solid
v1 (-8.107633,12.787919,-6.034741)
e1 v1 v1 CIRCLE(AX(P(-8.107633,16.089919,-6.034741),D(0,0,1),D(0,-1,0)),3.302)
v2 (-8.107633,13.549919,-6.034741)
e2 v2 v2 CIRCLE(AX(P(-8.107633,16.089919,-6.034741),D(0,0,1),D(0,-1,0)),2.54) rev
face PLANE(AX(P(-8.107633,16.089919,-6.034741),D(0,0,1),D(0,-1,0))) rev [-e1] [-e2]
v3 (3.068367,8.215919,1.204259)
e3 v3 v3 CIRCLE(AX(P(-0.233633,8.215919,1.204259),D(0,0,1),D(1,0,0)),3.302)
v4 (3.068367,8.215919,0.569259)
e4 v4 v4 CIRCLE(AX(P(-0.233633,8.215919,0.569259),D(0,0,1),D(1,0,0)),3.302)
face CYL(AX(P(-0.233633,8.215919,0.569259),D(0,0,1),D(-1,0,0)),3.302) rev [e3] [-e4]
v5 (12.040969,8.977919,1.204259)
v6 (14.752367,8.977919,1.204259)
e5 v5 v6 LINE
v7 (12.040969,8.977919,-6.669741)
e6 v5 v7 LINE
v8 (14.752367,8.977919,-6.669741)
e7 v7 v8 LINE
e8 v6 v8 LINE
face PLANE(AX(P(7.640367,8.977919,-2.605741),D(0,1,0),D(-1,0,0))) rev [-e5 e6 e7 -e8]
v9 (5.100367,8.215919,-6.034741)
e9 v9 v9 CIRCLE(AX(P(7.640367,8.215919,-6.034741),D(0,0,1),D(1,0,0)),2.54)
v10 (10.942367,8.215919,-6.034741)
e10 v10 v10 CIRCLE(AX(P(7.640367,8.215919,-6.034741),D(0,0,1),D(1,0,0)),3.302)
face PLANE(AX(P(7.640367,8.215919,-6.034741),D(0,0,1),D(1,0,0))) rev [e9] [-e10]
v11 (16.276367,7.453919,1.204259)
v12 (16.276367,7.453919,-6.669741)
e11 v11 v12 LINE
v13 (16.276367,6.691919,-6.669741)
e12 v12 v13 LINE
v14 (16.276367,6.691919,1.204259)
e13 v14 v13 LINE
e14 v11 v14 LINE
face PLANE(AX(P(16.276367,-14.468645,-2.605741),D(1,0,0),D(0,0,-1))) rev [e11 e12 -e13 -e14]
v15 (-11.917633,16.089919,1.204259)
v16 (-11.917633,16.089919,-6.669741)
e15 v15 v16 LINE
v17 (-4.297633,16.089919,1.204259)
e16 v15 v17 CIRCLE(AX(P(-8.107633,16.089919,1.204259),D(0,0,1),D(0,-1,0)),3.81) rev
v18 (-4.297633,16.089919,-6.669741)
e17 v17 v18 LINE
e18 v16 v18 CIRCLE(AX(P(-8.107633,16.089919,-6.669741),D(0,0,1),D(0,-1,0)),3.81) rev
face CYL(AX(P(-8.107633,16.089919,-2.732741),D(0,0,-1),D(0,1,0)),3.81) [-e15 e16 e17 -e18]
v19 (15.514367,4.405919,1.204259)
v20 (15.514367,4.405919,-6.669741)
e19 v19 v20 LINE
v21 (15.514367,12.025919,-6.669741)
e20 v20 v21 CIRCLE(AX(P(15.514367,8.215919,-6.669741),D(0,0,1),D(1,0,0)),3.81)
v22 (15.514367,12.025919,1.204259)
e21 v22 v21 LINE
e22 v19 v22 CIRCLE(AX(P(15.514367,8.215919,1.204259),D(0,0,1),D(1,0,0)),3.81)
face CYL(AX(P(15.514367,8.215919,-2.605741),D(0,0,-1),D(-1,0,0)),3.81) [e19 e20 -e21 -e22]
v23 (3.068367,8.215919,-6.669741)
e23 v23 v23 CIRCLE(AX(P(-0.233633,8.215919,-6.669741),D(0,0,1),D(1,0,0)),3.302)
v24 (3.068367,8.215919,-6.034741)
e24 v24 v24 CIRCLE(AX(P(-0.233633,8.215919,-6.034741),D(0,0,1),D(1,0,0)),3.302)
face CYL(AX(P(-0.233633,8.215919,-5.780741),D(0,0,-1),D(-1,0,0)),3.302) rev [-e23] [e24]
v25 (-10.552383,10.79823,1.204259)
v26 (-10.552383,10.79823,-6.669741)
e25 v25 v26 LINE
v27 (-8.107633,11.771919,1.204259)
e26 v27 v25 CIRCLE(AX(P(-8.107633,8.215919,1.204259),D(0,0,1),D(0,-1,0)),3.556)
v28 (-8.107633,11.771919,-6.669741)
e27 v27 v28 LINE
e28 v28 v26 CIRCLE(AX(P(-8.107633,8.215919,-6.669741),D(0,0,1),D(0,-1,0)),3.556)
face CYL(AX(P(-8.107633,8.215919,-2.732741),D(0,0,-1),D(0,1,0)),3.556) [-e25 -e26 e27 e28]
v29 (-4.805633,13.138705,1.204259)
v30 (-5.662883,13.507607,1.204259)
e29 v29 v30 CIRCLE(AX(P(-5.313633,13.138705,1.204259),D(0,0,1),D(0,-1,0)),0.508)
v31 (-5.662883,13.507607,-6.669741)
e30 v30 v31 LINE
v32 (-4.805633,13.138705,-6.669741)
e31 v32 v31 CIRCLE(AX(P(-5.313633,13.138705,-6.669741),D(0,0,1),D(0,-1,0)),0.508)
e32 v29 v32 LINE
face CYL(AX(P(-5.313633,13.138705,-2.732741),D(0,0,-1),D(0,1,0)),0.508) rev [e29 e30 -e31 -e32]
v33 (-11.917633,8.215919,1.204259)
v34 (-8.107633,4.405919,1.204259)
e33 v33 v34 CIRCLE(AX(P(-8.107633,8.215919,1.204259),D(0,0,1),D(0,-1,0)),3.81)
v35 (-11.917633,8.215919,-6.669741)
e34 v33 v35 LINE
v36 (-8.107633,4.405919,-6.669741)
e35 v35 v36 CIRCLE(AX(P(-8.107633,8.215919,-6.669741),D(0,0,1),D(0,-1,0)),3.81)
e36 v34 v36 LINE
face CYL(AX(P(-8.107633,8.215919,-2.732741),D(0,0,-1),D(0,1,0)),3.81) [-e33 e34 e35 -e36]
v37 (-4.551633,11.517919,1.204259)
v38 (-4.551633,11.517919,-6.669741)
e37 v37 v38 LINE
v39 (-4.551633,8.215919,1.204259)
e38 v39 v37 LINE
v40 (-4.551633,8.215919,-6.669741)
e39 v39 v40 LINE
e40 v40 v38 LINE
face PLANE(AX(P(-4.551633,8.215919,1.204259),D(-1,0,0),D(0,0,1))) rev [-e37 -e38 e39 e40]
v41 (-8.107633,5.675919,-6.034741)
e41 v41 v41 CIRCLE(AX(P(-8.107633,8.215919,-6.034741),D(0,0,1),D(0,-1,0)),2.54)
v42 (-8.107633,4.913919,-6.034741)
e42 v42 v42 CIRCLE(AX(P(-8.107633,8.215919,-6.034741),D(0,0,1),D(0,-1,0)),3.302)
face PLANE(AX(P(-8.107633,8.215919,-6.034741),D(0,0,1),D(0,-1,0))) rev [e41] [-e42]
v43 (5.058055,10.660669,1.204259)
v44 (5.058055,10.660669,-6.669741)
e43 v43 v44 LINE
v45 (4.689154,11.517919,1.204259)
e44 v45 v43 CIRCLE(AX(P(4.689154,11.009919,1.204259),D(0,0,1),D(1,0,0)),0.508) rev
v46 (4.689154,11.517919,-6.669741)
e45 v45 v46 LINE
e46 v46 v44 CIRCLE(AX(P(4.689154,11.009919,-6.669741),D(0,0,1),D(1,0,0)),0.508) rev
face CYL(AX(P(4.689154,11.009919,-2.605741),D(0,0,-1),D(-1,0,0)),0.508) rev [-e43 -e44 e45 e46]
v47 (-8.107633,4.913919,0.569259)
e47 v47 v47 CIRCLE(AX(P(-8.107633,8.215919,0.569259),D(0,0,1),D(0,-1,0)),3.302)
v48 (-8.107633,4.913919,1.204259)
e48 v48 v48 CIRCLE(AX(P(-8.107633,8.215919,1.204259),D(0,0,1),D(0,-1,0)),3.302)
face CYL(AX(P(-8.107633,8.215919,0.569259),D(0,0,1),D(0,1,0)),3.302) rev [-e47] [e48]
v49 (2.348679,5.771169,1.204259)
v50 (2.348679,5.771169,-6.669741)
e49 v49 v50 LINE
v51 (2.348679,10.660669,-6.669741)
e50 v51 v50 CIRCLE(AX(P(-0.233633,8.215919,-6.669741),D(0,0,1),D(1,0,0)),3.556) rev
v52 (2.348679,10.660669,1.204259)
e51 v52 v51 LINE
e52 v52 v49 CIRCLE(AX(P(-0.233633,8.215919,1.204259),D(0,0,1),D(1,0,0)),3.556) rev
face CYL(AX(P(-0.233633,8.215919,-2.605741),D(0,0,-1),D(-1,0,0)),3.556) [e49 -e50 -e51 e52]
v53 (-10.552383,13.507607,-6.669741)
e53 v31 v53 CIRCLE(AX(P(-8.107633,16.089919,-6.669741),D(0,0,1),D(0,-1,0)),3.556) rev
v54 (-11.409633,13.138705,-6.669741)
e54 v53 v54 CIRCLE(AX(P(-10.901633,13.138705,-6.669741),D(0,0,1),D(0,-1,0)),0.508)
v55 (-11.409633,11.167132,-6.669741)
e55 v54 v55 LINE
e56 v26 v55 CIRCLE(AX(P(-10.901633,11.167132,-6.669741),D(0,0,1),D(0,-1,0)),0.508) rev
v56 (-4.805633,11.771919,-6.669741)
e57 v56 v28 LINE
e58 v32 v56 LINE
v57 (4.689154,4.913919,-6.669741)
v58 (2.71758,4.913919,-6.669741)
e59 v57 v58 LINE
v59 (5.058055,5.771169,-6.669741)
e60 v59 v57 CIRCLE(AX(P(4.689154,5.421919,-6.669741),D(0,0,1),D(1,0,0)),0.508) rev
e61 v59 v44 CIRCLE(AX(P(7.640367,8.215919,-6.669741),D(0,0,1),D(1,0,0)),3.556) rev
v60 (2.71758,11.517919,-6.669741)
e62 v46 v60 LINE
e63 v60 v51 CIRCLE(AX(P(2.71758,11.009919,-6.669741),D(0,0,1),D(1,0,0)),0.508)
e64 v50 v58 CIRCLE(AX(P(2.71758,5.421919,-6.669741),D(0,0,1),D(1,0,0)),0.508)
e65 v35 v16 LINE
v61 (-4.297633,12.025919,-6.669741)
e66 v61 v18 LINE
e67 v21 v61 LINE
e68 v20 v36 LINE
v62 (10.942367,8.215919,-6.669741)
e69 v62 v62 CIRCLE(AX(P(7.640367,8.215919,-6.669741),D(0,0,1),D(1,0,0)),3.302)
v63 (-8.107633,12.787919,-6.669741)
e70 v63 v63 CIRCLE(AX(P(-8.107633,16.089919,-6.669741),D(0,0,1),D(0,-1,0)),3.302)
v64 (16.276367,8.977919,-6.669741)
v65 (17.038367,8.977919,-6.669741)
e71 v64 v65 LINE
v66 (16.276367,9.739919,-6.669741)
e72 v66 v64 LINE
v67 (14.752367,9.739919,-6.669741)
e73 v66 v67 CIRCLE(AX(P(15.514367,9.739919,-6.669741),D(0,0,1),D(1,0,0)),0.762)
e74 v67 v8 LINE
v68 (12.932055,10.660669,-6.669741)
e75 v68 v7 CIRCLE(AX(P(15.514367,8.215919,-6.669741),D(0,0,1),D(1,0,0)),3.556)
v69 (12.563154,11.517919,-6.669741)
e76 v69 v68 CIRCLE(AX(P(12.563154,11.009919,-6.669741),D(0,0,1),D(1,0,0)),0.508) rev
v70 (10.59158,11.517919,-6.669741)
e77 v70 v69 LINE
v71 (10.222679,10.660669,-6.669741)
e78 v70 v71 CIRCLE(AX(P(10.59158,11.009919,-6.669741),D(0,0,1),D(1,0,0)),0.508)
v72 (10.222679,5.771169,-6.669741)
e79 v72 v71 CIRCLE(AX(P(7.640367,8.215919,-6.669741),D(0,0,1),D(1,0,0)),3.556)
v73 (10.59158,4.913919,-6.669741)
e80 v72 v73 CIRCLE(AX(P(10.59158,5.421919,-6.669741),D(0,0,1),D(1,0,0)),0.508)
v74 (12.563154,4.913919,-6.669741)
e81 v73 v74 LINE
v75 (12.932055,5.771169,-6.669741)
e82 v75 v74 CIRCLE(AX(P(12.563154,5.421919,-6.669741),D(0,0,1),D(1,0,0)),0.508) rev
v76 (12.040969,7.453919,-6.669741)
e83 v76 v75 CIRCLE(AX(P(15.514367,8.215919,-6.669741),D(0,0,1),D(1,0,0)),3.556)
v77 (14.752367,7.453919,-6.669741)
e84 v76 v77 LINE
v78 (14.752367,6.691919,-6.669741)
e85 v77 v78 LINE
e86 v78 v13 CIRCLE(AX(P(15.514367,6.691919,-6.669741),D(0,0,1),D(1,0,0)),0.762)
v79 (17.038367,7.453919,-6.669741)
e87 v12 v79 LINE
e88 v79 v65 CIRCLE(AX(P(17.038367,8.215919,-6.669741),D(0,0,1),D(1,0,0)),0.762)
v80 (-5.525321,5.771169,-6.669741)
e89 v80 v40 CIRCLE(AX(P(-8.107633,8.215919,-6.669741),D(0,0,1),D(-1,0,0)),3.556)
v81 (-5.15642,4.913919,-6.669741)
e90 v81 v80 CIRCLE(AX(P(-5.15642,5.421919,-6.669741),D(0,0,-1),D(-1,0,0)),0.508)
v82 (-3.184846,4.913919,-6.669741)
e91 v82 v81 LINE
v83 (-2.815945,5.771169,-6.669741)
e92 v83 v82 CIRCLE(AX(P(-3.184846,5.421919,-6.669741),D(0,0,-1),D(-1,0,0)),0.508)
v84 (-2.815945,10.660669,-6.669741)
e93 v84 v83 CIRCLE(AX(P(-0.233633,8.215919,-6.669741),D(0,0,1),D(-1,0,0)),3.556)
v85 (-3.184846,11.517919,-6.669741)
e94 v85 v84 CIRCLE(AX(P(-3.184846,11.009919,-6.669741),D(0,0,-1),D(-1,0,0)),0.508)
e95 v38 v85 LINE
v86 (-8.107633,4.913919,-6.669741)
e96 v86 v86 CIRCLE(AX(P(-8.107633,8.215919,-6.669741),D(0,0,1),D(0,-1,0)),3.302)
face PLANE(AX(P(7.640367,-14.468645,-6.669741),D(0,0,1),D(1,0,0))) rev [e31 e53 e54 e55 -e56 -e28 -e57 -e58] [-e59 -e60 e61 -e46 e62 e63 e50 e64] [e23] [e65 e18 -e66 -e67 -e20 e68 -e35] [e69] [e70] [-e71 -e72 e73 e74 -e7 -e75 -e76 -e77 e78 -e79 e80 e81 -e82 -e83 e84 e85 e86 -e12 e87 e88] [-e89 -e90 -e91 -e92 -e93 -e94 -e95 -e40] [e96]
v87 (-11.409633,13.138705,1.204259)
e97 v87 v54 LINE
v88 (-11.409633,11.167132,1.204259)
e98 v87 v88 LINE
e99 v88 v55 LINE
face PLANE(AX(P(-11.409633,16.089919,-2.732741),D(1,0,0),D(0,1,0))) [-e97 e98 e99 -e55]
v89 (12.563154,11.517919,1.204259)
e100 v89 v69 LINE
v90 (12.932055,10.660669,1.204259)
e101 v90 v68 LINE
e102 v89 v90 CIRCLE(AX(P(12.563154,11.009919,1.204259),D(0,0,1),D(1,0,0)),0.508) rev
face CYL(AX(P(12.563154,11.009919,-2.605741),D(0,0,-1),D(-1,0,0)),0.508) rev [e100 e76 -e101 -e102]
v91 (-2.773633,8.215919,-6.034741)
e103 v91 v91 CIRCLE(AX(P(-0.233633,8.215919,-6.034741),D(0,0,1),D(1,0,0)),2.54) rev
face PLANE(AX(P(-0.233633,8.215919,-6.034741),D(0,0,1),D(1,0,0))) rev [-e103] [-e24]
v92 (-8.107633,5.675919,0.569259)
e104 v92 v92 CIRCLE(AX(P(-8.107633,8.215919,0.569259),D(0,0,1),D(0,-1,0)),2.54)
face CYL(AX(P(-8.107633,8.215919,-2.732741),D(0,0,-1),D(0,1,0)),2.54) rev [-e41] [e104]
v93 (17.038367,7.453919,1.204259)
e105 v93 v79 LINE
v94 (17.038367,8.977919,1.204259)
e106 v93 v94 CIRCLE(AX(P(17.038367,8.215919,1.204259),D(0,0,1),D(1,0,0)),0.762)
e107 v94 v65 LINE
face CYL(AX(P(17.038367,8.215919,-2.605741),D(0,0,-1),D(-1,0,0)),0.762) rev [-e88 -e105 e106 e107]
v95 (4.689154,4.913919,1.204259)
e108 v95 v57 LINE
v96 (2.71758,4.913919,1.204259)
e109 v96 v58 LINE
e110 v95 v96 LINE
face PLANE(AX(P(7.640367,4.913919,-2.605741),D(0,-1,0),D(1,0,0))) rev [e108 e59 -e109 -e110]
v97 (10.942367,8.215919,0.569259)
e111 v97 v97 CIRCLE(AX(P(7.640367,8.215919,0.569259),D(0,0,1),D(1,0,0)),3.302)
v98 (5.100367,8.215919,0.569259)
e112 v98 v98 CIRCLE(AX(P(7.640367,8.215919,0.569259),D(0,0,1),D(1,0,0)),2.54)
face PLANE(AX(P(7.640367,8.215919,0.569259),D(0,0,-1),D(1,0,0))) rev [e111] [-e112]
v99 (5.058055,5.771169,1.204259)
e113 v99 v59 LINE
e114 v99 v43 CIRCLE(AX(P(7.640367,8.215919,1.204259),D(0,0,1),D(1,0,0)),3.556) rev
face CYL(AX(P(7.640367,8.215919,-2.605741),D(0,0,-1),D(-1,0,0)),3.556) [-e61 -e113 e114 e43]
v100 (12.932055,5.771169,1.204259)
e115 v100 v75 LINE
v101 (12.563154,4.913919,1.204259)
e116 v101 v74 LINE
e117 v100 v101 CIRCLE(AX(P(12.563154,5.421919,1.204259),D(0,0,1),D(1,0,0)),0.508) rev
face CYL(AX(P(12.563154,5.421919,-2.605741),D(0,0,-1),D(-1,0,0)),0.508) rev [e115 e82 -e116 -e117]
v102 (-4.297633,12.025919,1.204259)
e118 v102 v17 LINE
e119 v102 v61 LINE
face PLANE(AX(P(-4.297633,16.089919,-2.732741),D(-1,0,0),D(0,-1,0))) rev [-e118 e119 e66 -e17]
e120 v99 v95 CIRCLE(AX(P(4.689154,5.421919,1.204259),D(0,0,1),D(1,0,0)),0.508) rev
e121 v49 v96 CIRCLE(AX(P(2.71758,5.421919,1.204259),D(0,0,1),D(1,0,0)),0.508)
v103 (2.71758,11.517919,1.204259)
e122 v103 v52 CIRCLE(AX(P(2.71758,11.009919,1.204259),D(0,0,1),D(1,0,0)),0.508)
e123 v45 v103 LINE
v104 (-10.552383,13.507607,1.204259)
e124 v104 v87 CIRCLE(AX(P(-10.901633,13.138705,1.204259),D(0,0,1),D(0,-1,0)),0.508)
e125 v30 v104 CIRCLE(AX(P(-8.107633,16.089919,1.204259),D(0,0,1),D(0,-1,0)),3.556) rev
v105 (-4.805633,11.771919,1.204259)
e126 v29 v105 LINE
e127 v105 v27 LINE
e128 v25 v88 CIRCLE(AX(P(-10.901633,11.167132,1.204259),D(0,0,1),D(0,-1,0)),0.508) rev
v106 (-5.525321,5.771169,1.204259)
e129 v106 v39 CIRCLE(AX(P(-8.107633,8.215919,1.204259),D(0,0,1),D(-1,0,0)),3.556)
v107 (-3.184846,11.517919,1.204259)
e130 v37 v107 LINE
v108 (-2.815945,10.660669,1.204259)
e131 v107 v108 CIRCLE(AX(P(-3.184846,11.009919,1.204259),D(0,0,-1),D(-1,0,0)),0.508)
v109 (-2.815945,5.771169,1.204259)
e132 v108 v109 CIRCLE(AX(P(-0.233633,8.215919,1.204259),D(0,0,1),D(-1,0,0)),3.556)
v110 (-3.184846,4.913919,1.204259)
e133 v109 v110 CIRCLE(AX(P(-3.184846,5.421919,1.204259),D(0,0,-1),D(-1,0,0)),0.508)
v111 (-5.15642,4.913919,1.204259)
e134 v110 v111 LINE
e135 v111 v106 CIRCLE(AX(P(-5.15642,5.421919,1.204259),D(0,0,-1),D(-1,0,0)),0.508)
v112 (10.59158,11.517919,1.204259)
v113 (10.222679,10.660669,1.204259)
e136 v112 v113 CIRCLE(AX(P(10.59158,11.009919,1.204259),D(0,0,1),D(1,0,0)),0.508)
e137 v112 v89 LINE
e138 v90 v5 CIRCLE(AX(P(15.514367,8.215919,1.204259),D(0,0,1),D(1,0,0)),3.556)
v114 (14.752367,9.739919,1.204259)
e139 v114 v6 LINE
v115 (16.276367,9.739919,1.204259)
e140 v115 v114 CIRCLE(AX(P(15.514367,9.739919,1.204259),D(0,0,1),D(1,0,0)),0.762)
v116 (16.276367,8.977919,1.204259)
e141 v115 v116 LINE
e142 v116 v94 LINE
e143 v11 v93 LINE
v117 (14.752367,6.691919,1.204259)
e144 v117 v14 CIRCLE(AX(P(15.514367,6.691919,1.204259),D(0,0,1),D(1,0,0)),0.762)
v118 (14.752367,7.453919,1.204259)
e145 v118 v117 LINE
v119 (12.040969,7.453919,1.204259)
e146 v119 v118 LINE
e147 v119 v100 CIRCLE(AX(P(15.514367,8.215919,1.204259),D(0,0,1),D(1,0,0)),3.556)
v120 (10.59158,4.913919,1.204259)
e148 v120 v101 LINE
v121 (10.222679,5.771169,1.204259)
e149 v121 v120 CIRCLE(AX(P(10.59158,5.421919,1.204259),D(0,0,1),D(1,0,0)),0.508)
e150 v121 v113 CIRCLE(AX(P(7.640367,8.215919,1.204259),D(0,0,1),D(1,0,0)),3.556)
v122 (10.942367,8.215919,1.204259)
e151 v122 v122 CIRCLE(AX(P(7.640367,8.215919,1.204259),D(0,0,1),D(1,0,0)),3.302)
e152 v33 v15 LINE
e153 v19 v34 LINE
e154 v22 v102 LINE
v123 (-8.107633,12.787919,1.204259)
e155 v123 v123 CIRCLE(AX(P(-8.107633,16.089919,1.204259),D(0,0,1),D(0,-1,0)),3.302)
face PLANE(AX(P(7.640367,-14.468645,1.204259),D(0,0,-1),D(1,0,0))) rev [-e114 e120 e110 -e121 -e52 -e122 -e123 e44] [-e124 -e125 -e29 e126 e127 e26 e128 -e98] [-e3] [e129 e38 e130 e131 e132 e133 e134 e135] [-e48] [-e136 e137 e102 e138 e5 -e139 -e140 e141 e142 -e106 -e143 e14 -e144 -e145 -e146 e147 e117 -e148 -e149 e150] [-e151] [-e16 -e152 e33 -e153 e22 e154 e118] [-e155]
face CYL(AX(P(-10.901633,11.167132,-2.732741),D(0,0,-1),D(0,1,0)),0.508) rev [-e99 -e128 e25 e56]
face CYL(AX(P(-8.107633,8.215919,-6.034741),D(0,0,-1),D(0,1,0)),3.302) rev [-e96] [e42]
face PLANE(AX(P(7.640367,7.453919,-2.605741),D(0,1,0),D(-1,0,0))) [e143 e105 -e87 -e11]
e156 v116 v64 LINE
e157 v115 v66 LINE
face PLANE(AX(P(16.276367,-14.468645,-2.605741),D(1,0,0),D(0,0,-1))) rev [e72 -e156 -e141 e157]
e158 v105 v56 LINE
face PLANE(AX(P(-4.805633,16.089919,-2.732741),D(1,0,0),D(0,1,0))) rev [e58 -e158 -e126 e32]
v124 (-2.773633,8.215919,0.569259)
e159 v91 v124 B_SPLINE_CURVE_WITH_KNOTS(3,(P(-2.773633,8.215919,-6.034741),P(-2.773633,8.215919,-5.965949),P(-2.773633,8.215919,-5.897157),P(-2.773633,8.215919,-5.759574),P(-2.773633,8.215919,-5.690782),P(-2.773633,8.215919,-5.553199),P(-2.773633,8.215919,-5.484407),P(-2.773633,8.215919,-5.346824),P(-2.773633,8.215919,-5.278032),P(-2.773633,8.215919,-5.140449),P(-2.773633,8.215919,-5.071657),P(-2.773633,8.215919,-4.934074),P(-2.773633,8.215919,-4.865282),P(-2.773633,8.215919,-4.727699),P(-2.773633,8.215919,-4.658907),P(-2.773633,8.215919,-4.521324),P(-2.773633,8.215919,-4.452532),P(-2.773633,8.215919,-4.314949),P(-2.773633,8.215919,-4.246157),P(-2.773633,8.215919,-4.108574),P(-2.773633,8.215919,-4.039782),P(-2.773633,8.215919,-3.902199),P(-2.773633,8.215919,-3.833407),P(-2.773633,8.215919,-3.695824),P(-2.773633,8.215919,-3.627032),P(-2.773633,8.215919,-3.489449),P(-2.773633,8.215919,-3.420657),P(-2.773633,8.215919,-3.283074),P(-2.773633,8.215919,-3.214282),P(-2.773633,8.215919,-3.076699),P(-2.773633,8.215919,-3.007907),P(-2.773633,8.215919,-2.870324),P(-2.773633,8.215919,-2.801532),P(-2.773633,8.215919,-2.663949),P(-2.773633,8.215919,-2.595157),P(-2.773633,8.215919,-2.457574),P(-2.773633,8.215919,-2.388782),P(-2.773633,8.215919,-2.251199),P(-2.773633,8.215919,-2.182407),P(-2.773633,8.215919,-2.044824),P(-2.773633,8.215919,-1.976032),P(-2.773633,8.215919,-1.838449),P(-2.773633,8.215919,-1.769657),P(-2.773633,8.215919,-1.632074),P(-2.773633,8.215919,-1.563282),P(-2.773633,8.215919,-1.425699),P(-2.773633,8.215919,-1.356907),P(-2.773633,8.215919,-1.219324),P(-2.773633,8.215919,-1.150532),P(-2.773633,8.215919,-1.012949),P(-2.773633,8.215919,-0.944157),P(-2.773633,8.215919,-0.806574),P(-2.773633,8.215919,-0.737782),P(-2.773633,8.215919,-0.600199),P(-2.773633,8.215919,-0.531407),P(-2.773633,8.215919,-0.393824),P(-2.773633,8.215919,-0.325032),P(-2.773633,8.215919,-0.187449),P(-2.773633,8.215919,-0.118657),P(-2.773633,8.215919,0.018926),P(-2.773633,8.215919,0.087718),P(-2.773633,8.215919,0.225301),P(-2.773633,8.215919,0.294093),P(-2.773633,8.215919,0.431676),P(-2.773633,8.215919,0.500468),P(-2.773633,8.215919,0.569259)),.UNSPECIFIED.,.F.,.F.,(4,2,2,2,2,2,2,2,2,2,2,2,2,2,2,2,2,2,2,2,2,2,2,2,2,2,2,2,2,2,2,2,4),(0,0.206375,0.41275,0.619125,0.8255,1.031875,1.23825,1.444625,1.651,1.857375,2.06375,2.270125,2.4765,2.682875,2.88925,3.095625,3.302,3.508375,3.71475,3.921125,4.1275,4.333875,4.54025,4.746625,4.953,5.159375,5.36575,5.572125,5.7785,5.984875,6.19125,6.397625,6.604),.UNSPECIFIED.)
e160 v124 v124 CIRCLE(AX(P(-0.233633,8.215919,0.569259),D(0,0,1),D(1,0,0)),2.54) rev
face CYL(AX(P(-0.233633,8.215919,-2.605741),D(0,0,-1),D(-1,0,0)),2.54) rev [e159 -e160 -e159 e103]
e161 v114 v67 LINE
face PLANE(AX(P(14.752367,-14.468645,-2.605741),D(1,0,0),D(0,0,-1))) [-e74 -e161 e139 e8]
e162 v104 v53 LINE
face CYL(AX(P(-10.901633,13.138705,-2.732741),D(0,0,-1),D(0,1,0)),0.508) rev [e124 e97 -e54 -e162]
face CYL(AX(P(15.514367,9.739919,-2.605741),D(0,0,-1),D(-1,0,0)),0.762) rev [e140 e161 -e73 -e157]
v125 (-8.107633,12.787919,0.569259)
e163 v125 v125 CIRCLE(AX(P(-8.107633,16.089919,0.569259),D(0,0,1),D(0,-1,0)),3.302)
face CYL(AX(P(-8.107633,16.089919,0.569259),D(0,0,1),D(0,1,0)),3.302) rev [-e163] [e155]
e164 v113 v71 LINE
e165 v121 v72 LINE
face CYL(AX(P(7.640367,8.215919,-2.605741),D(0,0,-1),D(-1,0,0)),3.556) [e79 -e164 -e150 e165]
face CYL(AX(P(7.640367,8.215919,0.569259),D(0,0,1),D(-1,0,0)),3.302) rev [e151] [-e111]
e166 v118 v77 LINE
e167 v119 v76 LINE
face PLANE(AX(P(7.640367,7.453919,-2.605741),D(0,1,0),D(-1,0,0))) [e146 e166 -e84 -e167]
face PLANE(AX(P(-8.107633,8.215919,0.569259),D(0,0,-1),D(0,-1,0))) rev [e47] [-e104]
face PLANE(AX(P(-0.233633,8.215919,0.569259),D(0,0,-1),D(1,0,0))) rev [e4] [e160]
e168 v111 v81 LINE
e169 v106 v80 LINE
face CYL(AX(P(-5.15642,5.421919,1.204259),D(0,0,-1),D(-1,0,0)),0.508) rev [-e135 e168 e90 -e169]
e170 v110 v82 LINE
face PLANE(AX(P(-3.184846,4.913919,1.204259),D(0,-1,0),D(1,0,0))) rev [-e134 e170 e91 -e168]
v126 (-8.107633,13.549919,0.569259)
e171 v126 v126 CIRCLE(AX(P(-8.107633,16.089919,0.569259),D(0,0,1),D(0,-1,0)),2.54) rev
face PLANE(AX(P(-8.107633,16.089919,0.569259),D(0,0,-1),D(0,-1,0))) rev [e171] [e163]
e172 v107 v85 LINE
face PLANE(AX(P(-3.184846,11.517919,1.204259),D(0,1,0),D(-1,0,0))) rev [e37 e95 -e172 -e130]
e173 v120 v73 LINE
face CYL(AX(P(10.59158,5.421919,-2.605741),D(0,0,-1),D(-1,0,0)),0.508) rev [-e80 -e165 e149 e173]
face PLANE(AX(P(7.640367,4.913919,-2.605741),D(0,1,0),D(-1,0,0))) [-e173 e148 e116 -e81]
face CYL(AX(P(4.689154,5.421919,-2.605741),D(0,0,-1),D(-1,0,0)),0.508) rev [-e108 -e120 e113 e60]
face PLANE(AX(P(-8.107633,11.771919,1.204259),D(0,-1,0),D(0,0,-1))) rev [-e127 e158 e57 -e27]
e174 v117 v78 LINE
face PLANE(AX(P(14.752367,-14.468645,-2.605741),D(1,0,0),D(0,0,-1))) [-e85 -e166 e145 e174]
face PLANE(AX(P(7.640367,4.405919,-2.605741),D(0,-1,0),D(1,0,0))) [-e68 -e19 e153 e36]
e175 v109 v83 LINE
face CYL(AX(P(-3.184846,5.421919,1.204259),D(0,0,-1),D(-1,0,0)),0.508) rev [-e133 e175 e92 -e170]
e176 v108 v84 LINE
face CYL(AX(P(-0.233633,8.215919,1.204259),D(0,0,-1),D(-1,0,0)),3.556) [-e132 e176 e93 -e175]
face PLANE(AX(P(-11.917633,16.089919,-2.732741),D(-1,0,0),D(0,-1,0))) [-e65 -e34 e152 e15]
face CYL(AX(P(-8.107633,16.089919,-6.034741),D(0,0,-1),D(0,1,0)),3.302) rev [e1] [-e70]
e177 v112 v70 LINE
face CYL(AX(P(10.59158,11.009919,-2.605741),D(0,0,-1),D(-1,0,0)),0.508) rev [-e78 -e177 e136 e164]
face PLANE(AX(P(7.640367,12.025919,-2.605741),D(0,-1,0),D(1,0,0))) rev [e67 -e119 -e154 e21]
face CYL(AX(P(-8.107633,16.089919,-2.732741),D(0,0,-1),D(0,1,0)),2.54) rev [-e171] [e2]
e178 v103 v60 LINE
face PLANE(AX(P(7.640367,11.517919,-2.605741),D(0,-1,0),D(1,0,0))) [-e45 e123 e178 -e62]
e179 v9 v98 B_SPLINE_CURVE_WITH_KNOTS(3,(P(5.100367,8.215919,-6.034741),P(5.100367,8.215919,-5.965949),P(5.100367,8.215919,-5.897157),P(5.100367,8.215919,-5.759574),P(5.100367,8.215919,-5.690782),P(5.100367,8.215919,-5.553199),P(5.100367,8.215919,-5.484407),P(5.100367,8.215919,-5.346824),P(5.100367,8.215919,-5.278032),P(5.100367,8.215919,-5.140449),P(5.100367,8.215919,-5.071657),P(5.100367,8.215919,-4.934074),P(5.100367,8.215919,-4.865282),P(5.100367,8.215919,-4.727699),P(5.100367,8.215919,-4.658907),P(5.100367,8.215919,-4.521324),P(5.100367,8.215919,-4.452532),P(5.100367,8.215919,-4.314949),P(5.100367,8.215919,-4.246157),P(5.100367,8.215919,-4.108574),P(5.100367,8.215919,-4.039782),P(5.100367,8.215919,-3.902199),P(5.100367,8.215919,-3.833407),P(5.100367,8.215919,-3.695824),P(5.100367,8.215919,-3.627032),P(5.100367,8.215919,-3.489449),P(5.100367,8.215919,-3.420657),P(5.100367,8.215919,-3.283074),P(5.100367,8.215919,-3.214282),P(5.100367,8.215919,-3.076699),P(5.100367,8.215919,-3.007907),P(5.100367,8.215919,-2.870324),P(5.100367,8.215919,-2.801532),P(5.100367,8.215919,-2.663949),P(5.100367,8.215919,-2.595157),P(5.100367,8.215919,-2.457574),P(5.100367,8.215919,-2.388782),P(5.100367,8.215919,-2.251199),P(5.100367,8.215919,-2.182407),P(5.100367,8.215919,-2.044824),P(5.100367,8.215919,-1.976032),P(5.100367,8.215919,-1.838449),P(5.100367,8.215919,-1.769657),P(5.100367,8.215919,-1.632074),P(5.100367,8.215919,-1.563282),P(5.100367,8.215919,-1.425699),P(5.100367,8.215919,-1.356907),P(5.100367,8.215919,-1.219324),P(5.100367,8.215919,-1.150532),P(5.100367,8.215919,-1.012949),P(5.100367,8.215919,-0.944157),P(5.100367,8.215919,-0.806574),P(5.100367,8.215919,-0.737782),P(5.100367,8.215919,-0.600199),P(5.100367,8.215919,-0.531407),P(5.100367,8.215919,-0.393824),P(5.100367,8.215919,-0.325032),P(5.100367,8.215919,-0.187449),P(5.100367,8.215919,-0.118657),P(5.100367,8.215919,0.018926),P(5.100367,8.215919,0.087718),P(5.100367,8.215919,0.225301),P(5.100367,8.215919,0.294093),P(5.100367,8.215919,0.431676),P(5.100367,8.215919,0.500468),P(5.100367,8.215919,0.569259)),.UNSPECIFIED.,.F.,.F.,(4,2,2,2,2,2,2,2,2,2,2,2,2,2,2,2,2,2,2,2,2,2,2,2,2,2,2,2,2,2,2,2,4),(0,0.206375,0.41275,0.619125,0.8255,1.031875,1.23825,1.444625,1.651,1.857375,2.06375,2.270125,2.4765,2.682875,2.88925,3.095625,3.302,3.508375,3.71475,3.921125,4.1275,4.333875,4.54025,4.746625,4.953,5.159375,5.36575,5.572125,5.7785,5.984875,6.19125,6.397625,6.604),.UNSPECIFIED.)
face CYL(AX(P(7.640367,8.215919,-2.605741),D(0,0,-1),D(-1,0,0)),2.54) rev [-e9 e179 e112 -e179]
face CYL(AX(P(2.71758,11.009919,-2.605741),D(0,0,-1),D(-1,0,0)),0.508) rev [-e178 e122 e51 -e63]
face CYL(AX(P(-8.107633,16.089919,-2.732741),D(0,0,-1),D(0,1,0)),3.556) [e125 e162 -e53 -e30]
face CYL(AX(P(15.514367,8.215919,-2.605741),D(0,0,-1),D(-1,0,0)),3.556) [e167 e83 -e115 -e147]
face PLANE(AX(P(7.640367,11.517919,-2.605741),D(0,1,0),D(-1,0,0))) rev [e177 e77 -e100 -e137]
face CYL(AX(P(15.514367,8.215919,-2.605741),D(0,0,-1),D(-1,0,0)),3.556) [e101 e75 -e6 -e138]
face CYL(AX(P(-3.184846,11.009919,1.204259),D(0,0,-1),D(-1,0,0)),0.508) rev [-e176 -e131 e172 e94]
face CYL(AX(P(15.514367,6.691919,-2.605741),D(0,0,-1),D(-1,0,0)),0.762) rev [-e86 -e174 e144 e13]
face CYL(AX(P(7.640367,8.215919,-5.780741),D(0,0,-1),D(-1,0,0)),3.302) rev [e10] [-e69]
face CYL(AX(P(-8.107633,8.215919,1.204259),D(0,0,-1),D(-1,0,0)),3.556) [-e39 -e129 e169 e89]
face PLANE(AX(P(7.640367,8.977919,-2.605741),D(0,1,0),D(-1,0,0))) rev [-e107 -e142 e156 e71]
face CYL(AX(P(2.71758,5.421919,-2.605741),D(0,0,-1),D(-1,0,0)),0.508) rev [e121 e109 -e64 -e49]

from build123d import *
from build123d.topology import SkipClean

# Parameters (mm, degrees)
LTEMPLATE_START              = -6.034740769
LTEMPLATE_OUTLINE_R          = 2.54
LTEMPLATE_DEPTH              = 6.35
LTEMPLATE_START_2            = -6.669740769
LTEMPLATE_2_OUTLINE_R        = 3.302
LTEMPLATE_2_DEPTH            = 7.62
TWOSTRAIGHT_START            = 0.352935157
TWOSTRAIGHT_OUTLINE_R        = 2.54
TWOSTRAIGHT_DEPTH            = 6.604
TWOSTRAIGHT_START_2          = -0.282064843
TWOSTRAIGHT_2_OUTLINE_R      = 3.302
TWOSTRAIGHT_2_DEPTH          = 7.874
BOSS_EXTRUDE1_DEPTH          = 7.874
BODY_MOVE_COPY18_START       = 1.204259231
BODY_MOVE_COPY18_OUTLINE_R   = 2.54
BODY_MOVE_COPY18_DEPTH       = 6.387675926
BODY_MOVE_COPY18_START_2     = -0.282064843
BODY_MOVE_COPY18_2_OUTLINE_R = 2.54
BODY_MOVE_COPY18_2_DEPTH     = 1.486324074
BODY_MOVE_COPY18_START_3     = 0.569259231
BODY_MOVE_COPY18_3_DEPTH     = 0.635
BODY_MOVE_COPY18_START_4     = -6.034740769
BODY_MOVE_COPY18_4_OUTLINE_R = 2.54
BODY_MOVE_COPY18_4_DEPTH     = 6.604
BODY_MOVE_COPY18_START_5     = -6.669740769
BODY_MOVE_COPY18_5_OUTLINE_R = 3.302
BODY_MOVE_COPY18_5_DEPTH     = 7.874
CUT_EXTRUDE3_DEPTH           = 7.874
CUT_EXTRUDE5_DEPTH           = 7.874
BOSS_EXTRUDE3_DEPTH          = 7.874


# Read off the part's stored shape, not the designer's step: LTemplate, TwoStraight, Body-Move/Copy18
with BuildPart() as part:
    # LTemplate outline → LTemplate (new body)
    with BuildSketch(Plane.XY.offset(LTEMPLATE_START)):
        with BuildLine():
            ThreePointArc((-0.233632913, 12.025918555), (-4.043632913, 8.215918555), (-0.233632913, 4.405918555))
            Line((-0.233632913, 4.405918555), (15.514367087, 4.405918555))
            ThreePointArc((15.514367087, 4.405918555), (19.324367087, 8.215918555), (15.514367087, 12.025918555))
            Line((15.514367087, 12.025918555), (-0.233632913, 12.025918555))
        make_face()
        with BuildLine():
            Line((4.689153777, 4.913918555), (2.717580397, 4.913918555))
            ThreePointArc((2.717580397, 4.913918555), (2.250952601, 5.221113923), (2.348678733, 5.771168555))
            ThreePointArc((2.348678733, 5.771168555), (3.322367087, 8.215918555), (2.348678733, 10.660668555))
            ThreePointArc((2.348678733, 10.660668555), (2.250952601, 11.210723186), (2.717580397, 11.517918555))
            Line((2.717580397, 11.517918555), (4.689153777, 11.517918555))
            ThreePointArc((4.689153777, 11.517918555), (5.155781573, 11.210723186), (5.058055441, 10.660668555))
            ThreePointArc((5.058055441, 10.660668555), (4.084367087, 8.215918555), (5.058055441, 5.771168555))
            ThreePointArc((5.058055441, 5.771168555), (5.155781573, 5.221113923), (4.689153777, 4.913918555))
        make_face(mode=Mode.SUBTRACT)
        with BuildLine():
            Line((12.040969327, 8.977918555), (14.752367087, 8.977918555))
            Line((14.752367087, 8.977918555), (14.752367087, 9.739918555))
            ThreePointArc((14.752367087, 9.739918555), (15.514367087, 10.501918555), (16.276367087, 9.739918555))
            Line((16.276367087, 9.739918555), (16.276367087, 8.977918555))
            Line((16.276367087, 8.977918555), (17.038367087, 8.977918555))
            ThreePointArc((17.038367087, 8.977918555), (17.800367087, 8.215918555), (17.038367087, 7.453918555))
            Line((17.038367087, 7.453918555), (16.276367087, 7.453918555))
            Line((16.276367087, 7.453918555), (16.276367087, 6.691918555))
            ThreePointArc((16.276367087, 6.691918555), (15.514367087, 5.929918555), (14.752367087, 6.691918555))
            Line((14.752367087, 6.691918555), (14.752367087, 7.453918555))
            Line((14.752367087, 7.453918555), (12.040969327, 7.453918555))
            ThreePointArc((12.040969327, 7.453918555), (12.371785983, 6.551791154), (12.932055441, 5.771168555))
            ThreePointArc((12.932055441, 5.771168555), (13.029781573, 5.221113923), (12.563153777, 4.913918555))
            Line((12.563153777, 4.913918555), (10.591580397, 4.913918555))
            ThreePointArc((10.591580397, 4.913918555), (10.124952601, 5.221113923), (10.222678733, 5.771168555))
            ThreePointArc((10.222678733, 5.771168555), (11.196367087, 8.215918555), (10.222678733, 10.660668555))
            ThreePointArc((10.222678733, 10.660668555), (10.124952601, 11.210723186), (10.591580397, 11.517918555))
            Line((10.591580397, 11.517918555), (12.563153777, 11.517918555))
            ThreePointArc((12.563153777, 11.517918555), (13.029781573, 11.210723186), (12.932055441, 10.660668555))
            ThreePointArc((12.932055441, 10.660668555), (12.371785983, 9.880045956), (12.040969327, 8.977918555))
        make_face(mode=Mode.SUBTRACT)
        with Locations((-0.233632913, 8.215918555)):
            Circle(LTEMPLATE_OUTLINE_R, mode=Mode.SUBTRACT)
        with Locations((7.640367087, 8.215918555)):
            Circle(LTEMPLATE_OUTLINE_R, mode=Mode.SUBTRACT)
    extrude(amount=LTEMPLATE_DEPTH)

    # LTemplate 2 outline → LTemplate 2 (add)
    with BuildSketch(Plane.XY.offset(LTEMPLATE_START_2)):
        with BuildLine():
            ThreePointArc((-0.233632913, 12.025918555), (-4.043632913, 8.215918555), (-0.233632913, 4.405918555))
            Line((-0.233632913, 4.405918555), (15.514367087, 4.405918555))
            ThreePointArc((15.514367087, 4.405918555), (19.324367087, 8.215918555), (15.514367087, 12.025918555))
            Line((15.514367087, 12.025918555), (-0.233632913, 12.025918555))
        make_face()
        with Locations((-0.233632913, 8.215918555)):
            Circle(LTEMPLATE_2_OUTLINE_R, mode=Mode.SUBTRACT)
        with BuildLine():
            Line((4.689153777, 4.913918555), (2.717580397, 4.913918555))
            ThreePointArc((2.717580397, 4.913918555), (2.250952601, 5.221113923), (2.348678733, 5.771168555))
            ThreePointArc((2.348678733, 5.771168555), (3.322367087, 8.215918555), (2.348678733, 10.660668555))
            ThreePointArc((2.348678733, 10.660668555), (2.250952601, 11.210723186), (2.717580397, 11.517918555))
            Line((2.717580397, 11.517918555), (4.689153777, 11.517918555))
            ThreePointArc((4.689153777, 11.517918555), (5.155781573, 11.210723186), (5.058055441, 10.660668555))
            ThreePointArc((5.058055441, 10.660668555), (4.084367087, 8.215918555), (5.058055441, 5.771168555))
            ThreePointArc((5.058055441, 5.771168555), (5.155781573, 5.221113923), (4.689153777, 4.913918555))
        make_face(mode=Mode.SUBTRACT)
        with Locations((7.640367087, 8.215918555)):
            Circle(LTEMPLATE_2_OUTLINE_R, mode=Mode.SUBTRACT)
        with BuildLine():
            Line((12.040969327, 8.977918555), (14.752367087, 8.977918555))
            Line((14.752367087, 8.977918555), (14.752367087, 9.739918555))
            ThreePointArc((14.752367087, 9.739918555), (15.514367087, 10.501918555), (16.276367087, 9.739918555))
            Line((16.276367087, 9.739918555), (16.276367087, 8.977918555))
            Line((16.276367087, 8.977918555), (17.038367087, 8.977918555))
            ThreePointArc((17.038367087, 8.977918555), (17.800367087, 8.215918555), (17.038367087, 7.453918555))
            Line((17.038367087, 7.453918555), (16.276367087, 7.453918555))
            Line((16.276367087, 7.453918555), (16.276367087, 6.691918555))
            ThreePointArc((16.276367087, 6.691918555), (15.514367087, 5.929918555), (14.752367087, 6.691918555))
            Line((14.752367087, 6.691918555), (14.752367087, 7.453918555))
            Line((14.752367087, 7.453918555), (12.040969327, 7.453918555))
            ThreePointArc((12.040969327, 7.453918555), (12.371785983, 6.551791154), (12.932055441, 5.771168555))
            ThreePointArc((12.932055441, 5.771168555), (13.029781573, 5.221113923), (12.563153777, 4.913918555))
            Line((12.563153777, 4.913918555), (10.591580397, 4.913918555))
            ThreePointArc((10.591580397, 4.913918555), (10.124952601, 5.221113923), (10.222678733, 5.771168555))
            ThreePointArc((10.222678733, 5.771168555), (11.196367087, 8.215918555), (10.222678733, 10.660668555))
            ThreePointArc((10.222678733, 10.660668555), (10.124952601, 11.210723186), (10.591580397, 11.517918555))
            Line((10.591580397, 11.517918555), (12.563153777, 11.517918555))
            ThreePointArc((12.563153777, 11.517918555), (13.029781573, 11.210723186), (12.932055441, 10.660668555))
            ThreePointArc((12.932055441, 10.660668555), (12.371785983, 9.880045956), (12.040969327, 8.977918555))
        make_face(mode=Mode.SUBTRACT)
    extrude(amount=LTEMPLATE_2_DEPTH)


with BuildPart() as body_2:
    # Body-Move/Copy15: copy of part
    add(part.part.moved(Location((0, 0, 0.254))))

    # Combine1: union part
    add(part.part)

    # Sketch1 → Boss-Extrude1 (add)
    with BuildSketch(Plane(origin=(0, 0, -6.669740769), x_dir=(-1, 0, 0), z_dir=(0, 0, -1))):
        with BuildLine():
            Line((8.107632913, 12.025918555), (0.233632913, 12.025918555))
            Line((0.233632913, 12.025918555), (0.233632913, 11.517918555))
            ThreePointArc((0.233632913, 11.517918555), (3.535632913, 8.215918555), (0.233632913, 4.913918555))
            Line((0.233632913, 4.913918555), (0.233632913, 4.405918555))
            Line((0.233632913, 4.405918555), (8.107632913, 4.405918555))
            ThreePointArc((8.107632913, 4.405918555), (4.297632913, 8.215918555), (8.107632913, 12.025918555))
        make_face()
    extrude(amount=-BOSS_EXTRUDE1_DEPTH)


with BuildPart() as body_2_2:
    # TwoStraight outline → TwoStraight (new body)
    with BuildSketch(Plane.XY.offset(TWOSTRAIGHT_START)):
        with BuildLine():
            ThreePointArc((-7.731255998, 20.304824752), (-11.541255998, 16.494824752), (-7.731255998, 12.684824752))
            Line((-7.731255998, 12.684824752), (0.142744002, 12.684824752))
            ThreePointArc((0.142744002, 12.684824752), (3.952744002, 16.494824752), (0.142744002, 20.304824752))
            Line((0.142744002, 20.304824752), (-7.731255998, 20.304824752))
        make_face()
        with BuildLine():
            Line((-4.780042688, 19.796824752), (-2.808469308, 19.796824752))
            ThreePointArc((-2.808469308, 19.796824752), (-2.341841512, 19.489629383), (-2.439567644, 18.939574752))
            ThreePointArc((-2.439567644, 18.939574752), (-3.413255998, 16.494824752), (-2.439567644, 14.050074752))
            ThreePointArc((-2.439567644, 14.050074752), (-2.341841512, 13.500020121), (-2.808469308, 13.192824752))
            Line((-2.808469308, 13.192824752), (-4.780042688, 13.192824752))
            ThreePointArc((-4.780042688, 13.192824752), (-5.246670484, 13.500020121), (-5.148944352, 14.050074752))
            ThreePointArc((-5.148944352, 14.050074752), (-4.175255998, 16.494824752), (-5.148944352, 18.939574752))
            ThreePointArc((-5.148944352, 18.939574752), (-5.246670484, 19.489629383), (-4.780042688, 19.796824752))
        make_face(mode=Mode.SUBTRACT)
        with Locations((-7.731255998, 16.494824752)):
            Circle(TWOSTRAIGHT_OUTLINE_R, mode=Mode.SUBTRACT)
        with Locations((0.142744002, 16.494824752)):
            Circle(TWOSTRAIGHT_OUTLINE_R, mode=Mode.SUBTRACT)
    extrude(amount=TWOSTRAIGHT_DEPTH)

    # TwoStraight 2 outline → TwoStraight 2 (add)
    with BuildSketch(Plane.XY.offset(TWOSTRAIGHT_START_2)):
        with BuildLine():
            ThreePointArc((-7.731255998, 20.304824752), (-11.541255998, 16.494824752), (-7.731255998, 12.684824752))
            Line((-7.731255998, 12.684824752), (0.142744002, 12.684824752))
            ThreePointArc((0.142744002, 12.684824752), (3.952744002, 16.494824752), (0.142744002, 20.304824752))
            Line((0.142744002, 20.304824752), (-7.731255998, 20.304824752))
        make_face()
        with Locations((-7.731255998, 16.494824752)):
            Circle(TWOSTRAIGHT_2_OUTLINE_R, mode=Mode.SUBTRACT)
        with BuildLine():
            Line((-4.780042688, 19.796824752), (-2.808469308, 19.796824752))
            ThreePointArc((-2.808469308, 19.796824752), (-2.341841512, 19.489629383), (-2.439567644, 18.939574752))
            ThreePointArc((-2.439567644, 18.939574752), (-3.413255998, 16.494824752), (-2.439567644, 14.050074752))
            ThreePointArc((-2.439567644, 14.050074752), (-2.341841512, 13.500020121), (-2.808469308, 13.192824752))
            Line((-2.808469308, 13.192824752), (-4.780042688, 13.192824752))
            ThreePointArc((-4.780042688, 13.192824752), (-5.246670484, 13.500020121), (-5.148944352, 14.050074752))
            ThreePointArc((-5.148944352, 14.050074752), (-4.175255998, 16.494824752), (-5.148944352, 18.939574752))
            ThreePointArc((-5.148944352, 18.939574752), (-5.246670484, 19.489629383), (-4.780042688, 19.796824752))
        make_face(mode=Mode.SUBTRACT)
        with Locations((0.142744002, 16.494824752)):
            Circle(TWOSTRAIGHT_2_OUTLINE_R, mode=Mode.SUBTRACT)
    extrude(amount=TWOSTRAIGHT_2_DEPTH)

    # Body-Move/Copy18 outline → Body-Move/Copy18 (cut)
    with BuildSketch(Plane.XY.offset(BODY_MOVE_COPY18_START)):
        with BuildLine():
            ThreePointArc((0.142744002, 12.684824752), (3.952744002, 16.494824752), (0.142744002, 20.304824752))
            Line((0.142744002, 20.304824752), (-7.731255998, 20.304824752))
            ThreePointArc((-7.731255998, 20.304824752), (-11.541255998, 16.494824752), (-7.731255998, 12.684824752))
            Line((-7.731255998, 12.684824752), (0.142744002, 12.684824752))
        make_face()
        with BuildLine():
            ThreePointArc((-5.148944352, 14.050074752), (-4.175255998, 16.494824752), (-5.148944352, 18.939574752))
            ThreePointArc((-5.148944352, 18.939574752), (-5.246670484, 19.489629383), (-4.780042688, 19.796824752))
            Line((-4.780042688, 19.796824752), (-2.808469308, 19.796824752))
            ThreePointArc((-2.808469308, 19.796824752), (-2.341841512, 19.489629383), (-2.439567644, 18.939574752))
            ThreePointArc((-2.439567644, 18.939574752), (-3.413255998, 16.494824752), (-2.439567644, 14.050074752))
            ThreePointArc((-2.439567644, 14.050074752), (-2.341841512, 13.500020121), (-2.808469308, 13.192824752))
            Line((-2.808469308, 13.192824752), (-4.780042688, 13.192824752))
            ThreePointArc((-4.780042688, 13.192824752), (-5.246670484, 13.500020121), (-5.148944352, 14.050074752))
        make_face(mode=Mode.SUBTRACT)
        with Locations((-7.731255998, 16.494824752)):
            Circle(BODY_MOVE_COPY18_OUTLINE_R, mode=Mode.SUBTRACT)
        with Locations((0.142744002, 16.494824752)):
            Circle(BODY_MOVE_COPY18_OUTLINE_R, mode=Mode.SUBTRACT)
    extrude(amount=BODY_MOVE_COPY18_DEPTH, mode=Mode.SUBTRACT)

    # Body-Move_Copy18 2 outline → Body-Move_Copy18 2 (cut)
    # profile 1 of 3: a face of its own
    with BuildSketch(Plane.XY.offset(BODY_MOVE_COPY18_START_2)):
        with BuildLine():
            Line((-7.082707456, 12.684824752), (-4.805632913, 12.684824752))
            Line((-4.805632913, 12.684824752), (-4.805632913, 13.138705245))
            ThreePointArc((-4.805632913, 13.138705245), (-4.806377911, 13.166207289), (-4.808610718, 13.193628668))
            ThreePointArc((-4.808610718, 13.193628668), (-5.12978155, 13.332386524), (-5.285064883, 13.645901329))
            ThreePointArc((-5.285064883, 13.645901329), (-5.4882484, 13.615751817), (-5.662882913, 13.507606909))
            ThreePointArc((-5.662882913, 13.507606909), (-6.324684634, 13.013194415), (-7.082707456, 12.684824752))
        make_face()
    # profile 2 of 3: a face of its own
    with BuildSketch(Plane.XY.offset(BODY_MOVE_COPY18_START_2)):
        with BuildLine():
            Line((-4.297632913, 13.192824752), (-4.297632913, 12.684824752))
            Line((-4.297632913, 12.684824752), (0.142744002, 12.684824752))
            ThreePointArc((0.142744002, 12.684824752), (3.952744002, 16.494824752), (0.142744002, 20.304824752))
            Line((0.142744002, 20.304824752), (-7.731255998, 20.304824752))
            ThreePointArc((-7.731255998, 20.304824752), (-9.379051287, 19.93006429), (-10.702684622, 18.879507526))
            ThreePointArc((-10.702684622, 18.879507526), (-6.586292552, 19.583000791), (-4.297632913, 16.089918555))
            Line((-4.297632913, 16.089918555), (-4.297632913, 15.569963406))
            ThreePointArc((-4.297632913, 15.569963406), (-4.283584635, 17.365857571), (-5.148944352, 18.939574752))
            ThreePointArc((-5.148944352, 18.939574752), (-5.246670484, 19.489629383), (-4.780042688, 19.796824752))
            Line((-4.780042688, 19.796824752), (-2.808469308, 19.796824752))
            ThreePointArc((-2.808469308, 19.796824752), (-2.341841512, 19.489629383), (-2.439567644, 18.939574752))
            ThreePointArc((-2.439567644, 18.939574752), (-3.413255998, 16.494824752), (-2.439567644, 14.050074752))
            ThreePointArc((-2.439567644, 14.050074752), (-2.341841512, 13.500020121), (-2.808469308, 13.192824752))
            Line((-2.808469308, 13.192824752), (-4.297632913, 13.192824752))
        make_face()
        with Locations((0.142744002, 16.494824752)):
            Circle(BODY_MOVE_COPY18_2_OUTLINE_R, mode=Mode.SUBTRACT)
    # profile 3 of 3: a face of its own
    with BuildSketch(Plane.XY.offset(BODY_MOVE_COPY18_START_2)):
        with BuildLine():
            ThreePointArc((-6.070097213, 14.573327551), (-9.460570174, 14.634428966), (-9.768791698, 18.011415756))
            ThreePointArc((-9.768791698, 18.011415756), (-9.836947089, 14.229522769), (-6.070097213, 14.573327551))
        make_face()
    extrude(amount=BODY_MOVE_COPY18_2_DEPTH, mode=Mode.SUBTRACT)

    # Body-Move_Copy18 3 outline → Body-Move_Copy18 3 (cut)
    with BuildSketch(Plane.XY.offset(BODY_MOVE_COPY18_START_3)):
        with BuildLine():
            ThreePointArc((-11.168403989, 14.85101403), (-10.325227262, 13.704231073), (-9.120001735, 12.946940132))
            ThreePointArc((-9.120001735, 12.946940132), (-5.859524484, 18.508433077), (-11.168403989, 14.85101403))
        make_face()
        with BuildLine():
            ThreePointArc((-9.768791698, 18.011415756), (-6.001941822, 18.355220538), (-6.070097213, 14.573327551))
            ThreePointArc((-6.070097213, 14.573327551), (-9.836947089, 14.229522769), (-9.768791698, 18.011415756))
        make_face(mode=Mode.SUBTRACT)
    extrude(amount=BODY_MOVE_COPY18_3_DEPTH, mode=Mode.SUBTRACT)

    # Body-Move_Copy18 4 outline → Body-Move_Copy18 4 (add)
    with SkipClean():  # the faces are left unmerged after this step: merging them gives an invalid solid
        with BuildSketch(Plane.XY.offset(BODY_MOVE_COPY18_START_4)):
            with BuildLine():
                Line((-4.297632913, 8.215918555), (-4.297632913, 16.089918555))
                ThreePointArc((-4.297632913, 16.089918555), (-8.107632913, 19.899918555), (-11.917632913, 16.089918555))
                Line((-11.917632913, 16.089918555), (-11.917632913, 8.215918555))
                ThreePointArc((-11.917632913, 8.215918555), (-8.107632913, 4.405918555), (-4.297632913, 8.215918555))
            make_face()
            with BuildLine():
                ThreePointArc((-4.805632913, 11.167131865), (-5.112828282, 10.700504069), (-5.662882913, 10.798230201))
                ThreePointArc((-5.662882913, 10.798230201), (-8.107632913, 11.771918555), (-10.552382913, 10.798230201))
                ThreePointArc((-10.552382913, 10.798230201), (-11.102437545, 10.700504069), (-11.409632913, 11.167131865))
                Line((-11.409632913, 11.167131865), (-11.409632913, 13.138705245))
                ThreePointArc((-11.409632913, 13.138705245), (-11.102437545, 13.605333041), (-10.552382913, 13.507606909))
                ThreePointArc((-10.552382913, 13.507606909), (-8.107632913, 12.533918555), (-5.662882913, 13.507606909))
                ThreePointArc((-5.662882913, 13.507606909), (-5.112828282, 13.605333041), (-4.805632913, 13.138705245))
                Line((-4.805632913, 13.138705245), (-4.805632913, 11.167131865))
            make_face(mode=Mode.SUBTRACT)
            with Locations((-8.107632913, 8.215918555)):
                Circle(BODY_MOVE_COPY18_4_OUTLINE_R, mode=Mode.SUBTRACT)
            with Locations((-8.107632913, 16.089918555)):
                Circle(BODY_MOVE_COPY18_4_OUTLINE_R, mode=Mode.SUBTRACT)
        extrude(amount=BODY_MOVE_COPY18_4_DEPTH)
    add(body_2_2.part.scale(1), mode=Mode.REPLACE)  # the faces are merged on a copy

    # Body-Move_Copy18 5 outline → Body-Move_Copy18 5 (add)
    with SkipClean():  # the faces are left unmerged after this step: merging them gives an invalid solid
        with BuildSketch(Plane.XY.offset(BODY_MOVE_COPY18_START_5)):
            with BuildLine():
                Line((-4.297632913, 8.215918555), (-4.297632913, 16.089918555))
                ThreePointArc((-4.297632913, 16.089918555), (-8.107632913, 19.899918555), (-11.917632913, 16.089918555))
                Line((-11.917632913, 16.089918555), (-11.917632913, 8.215918555))
                ThreePointArc((-11.917632913, 8.215918555), (-8.107632913, 4.405918555), (-4.297632913, 8.215918555))
            make_face()
            with BuildLine():
                ThreePointArc((-4.805632913, 11.167131865), (-5.112828282, 10.700504069), (-5.662882913, 10.798230201))
                ThreePointArc((-5.662882913, 10.798230201), (-8.107632913, 11.771918555), (-10.552382913, 10.798230201))
                ThreePointArc((-10.552382913, 10.798230201), (-11.102437545, 10.700504069), (-11.409632913, 11.167131865))
                Line((-11.409632913, 11.167131865), (-11.409632913, 13.138705245))
                ThreePointArc((-11.409632913, 13.138705245), (-11.102437545, 13.605333041), (-10.552382913, 13.507606909))
                ThreePointArc((-10.552382913, 13.507606909), (-8.107632913, 12.533918555), (-5.662882913, 13.507606909))
                ThreePointArc((-5.662882913, 13.507606909), (-5.112828282, 13.605333041), (-4.805632913, 13.138705245))
                Line((-4.805632913, 13.138705245), (-4.805632913, 11.167131865))
            make_face(mode=Mode.SUBTRACT)
            with Locations((-8.107632913, 16.089918555)):
                Circle(BODY_MOVE_COPY18_5_OUTLINE_R, mode=Mode.SUBTRACT)
            with Locations((-8.107632913, 8.215918555)):
                Circle(BODY_MOVE_COPY18_5_OUTLINE_R, mode=Mode.SUBTRACT)
        extrude(amount=BODY_MOVE_COPY18_5_DEPTH)
    add(body_2_2.part.scale(1), mode=Mode.REPLACE)  # the faces are merged on a copy


with BuildPart() as body_2_1:
    add(body_2.part)

    # Combine2: union body 2 2
    add(body_2_2.part)

    # Sketch4 → Cut-Extrude3 (cut)
    with BuildSketch(Plane(origin=(0, 0, -6.669740769), x_dir=(-1, 0, 0), z_dir=(0, 0, -1))):
        with BuildLine():
            Line((3.184846223, 4.913918555), (5.156419603, 4.913918555))
            ThreePointArc((5.156419603, 4.913918555), (5.623047399, 5.221113923), (5.525321267, 5.771168555))
            ThreePointArc((5.525321267, 5.771168555), (4.804010945, 6.900161019), (4.551632913, 8.215918555))
            Line((4.551632913, 8.215918555), (4.551632913, 11.517918555))
            Line((4.551632913, 11.517918555), (3.184846223, 11.517918555))
            ThreePointArc((3.184846223, 11.517918555), (2.718218427, 11.210723186), (2.815944559, 10.660668555))
            ThreePointArc((2.815944559, 10.660668555), (3.789632913, 8.215918555), (2.815944559, 5.771168555))
            ThreePointArc((2.815944559, 5.771168555), (2.718218427, 5.221113923), (3.184846223, 4.913918555))
        make_face()
    extrude(amount=-CUT_EXTRUDE3_DEPTH, mode=Mode.SUBTRACT)

    # Sketch6 → Cut-Extrude5 (cut)
    with BuildSketch(Plane(origin=(0, 0, -6.669740769), x_dir=(-1, 0, 0), z_dir=(0, 0, -1))):
        with BuildLine():
            Line((11.409632913, 13.138705245), (11.409632913, 11.167131865))
            ThreePointArc((11.409632913, 11.167131865), (11.102437545, 10.700504069), (10.552382913, 10.798230201))
            ThreePointArc((10.552382913, 10.798230201), (9.423390449, 11.519540523), (8.107632913, 11.771918555))
            Line((8.107632913, 11.771918555), (4.805632913, 11.771918555))
            Line((4.805632913, 11.771918555), (4.805632913, 13.138705245))
            ThreePointArc((4.805632913, 13.138705245), (5.112828282, 13.605333041), (5.662882913, 13.507606909))
            ThreePointArc((5.662882913, 13.507606909), (8.107632913, 12.533918555), (10.552382913, 13.507606909))
            ThreePointArc((10.552382913, 13.507606909), (11.102437545, 13.605333041), (11.409632913, 13.138705245))
        make_face()
    extrude(amount=-CUT_EXTRUDE5_DEPTH, mode=Mode.SUBTRACT)

    # Sketch8 → Boss-Extrude3 (add)
    with BuildSketch(Plane(origin=(0, 0, -6.669740769), x_dir=(-1, 0, 0), z_dir=(0, 0, -1))):
        with BuildLine():
            Line((4.805632913, 11.771918555), (8.107632913, 11.771918555))
            ThreePointArc((8.107632913, 11.771918555), (6.109495376, 11.157445774), (4.801909655, 9.526387836))
            Line((4.801909655, 9.526387836), (4.805632913, 11.771918555))
        make_face()
    extrude(amount=-BOSS_EXTRUDE3_DEPTH)


solid = body_2_1.part
